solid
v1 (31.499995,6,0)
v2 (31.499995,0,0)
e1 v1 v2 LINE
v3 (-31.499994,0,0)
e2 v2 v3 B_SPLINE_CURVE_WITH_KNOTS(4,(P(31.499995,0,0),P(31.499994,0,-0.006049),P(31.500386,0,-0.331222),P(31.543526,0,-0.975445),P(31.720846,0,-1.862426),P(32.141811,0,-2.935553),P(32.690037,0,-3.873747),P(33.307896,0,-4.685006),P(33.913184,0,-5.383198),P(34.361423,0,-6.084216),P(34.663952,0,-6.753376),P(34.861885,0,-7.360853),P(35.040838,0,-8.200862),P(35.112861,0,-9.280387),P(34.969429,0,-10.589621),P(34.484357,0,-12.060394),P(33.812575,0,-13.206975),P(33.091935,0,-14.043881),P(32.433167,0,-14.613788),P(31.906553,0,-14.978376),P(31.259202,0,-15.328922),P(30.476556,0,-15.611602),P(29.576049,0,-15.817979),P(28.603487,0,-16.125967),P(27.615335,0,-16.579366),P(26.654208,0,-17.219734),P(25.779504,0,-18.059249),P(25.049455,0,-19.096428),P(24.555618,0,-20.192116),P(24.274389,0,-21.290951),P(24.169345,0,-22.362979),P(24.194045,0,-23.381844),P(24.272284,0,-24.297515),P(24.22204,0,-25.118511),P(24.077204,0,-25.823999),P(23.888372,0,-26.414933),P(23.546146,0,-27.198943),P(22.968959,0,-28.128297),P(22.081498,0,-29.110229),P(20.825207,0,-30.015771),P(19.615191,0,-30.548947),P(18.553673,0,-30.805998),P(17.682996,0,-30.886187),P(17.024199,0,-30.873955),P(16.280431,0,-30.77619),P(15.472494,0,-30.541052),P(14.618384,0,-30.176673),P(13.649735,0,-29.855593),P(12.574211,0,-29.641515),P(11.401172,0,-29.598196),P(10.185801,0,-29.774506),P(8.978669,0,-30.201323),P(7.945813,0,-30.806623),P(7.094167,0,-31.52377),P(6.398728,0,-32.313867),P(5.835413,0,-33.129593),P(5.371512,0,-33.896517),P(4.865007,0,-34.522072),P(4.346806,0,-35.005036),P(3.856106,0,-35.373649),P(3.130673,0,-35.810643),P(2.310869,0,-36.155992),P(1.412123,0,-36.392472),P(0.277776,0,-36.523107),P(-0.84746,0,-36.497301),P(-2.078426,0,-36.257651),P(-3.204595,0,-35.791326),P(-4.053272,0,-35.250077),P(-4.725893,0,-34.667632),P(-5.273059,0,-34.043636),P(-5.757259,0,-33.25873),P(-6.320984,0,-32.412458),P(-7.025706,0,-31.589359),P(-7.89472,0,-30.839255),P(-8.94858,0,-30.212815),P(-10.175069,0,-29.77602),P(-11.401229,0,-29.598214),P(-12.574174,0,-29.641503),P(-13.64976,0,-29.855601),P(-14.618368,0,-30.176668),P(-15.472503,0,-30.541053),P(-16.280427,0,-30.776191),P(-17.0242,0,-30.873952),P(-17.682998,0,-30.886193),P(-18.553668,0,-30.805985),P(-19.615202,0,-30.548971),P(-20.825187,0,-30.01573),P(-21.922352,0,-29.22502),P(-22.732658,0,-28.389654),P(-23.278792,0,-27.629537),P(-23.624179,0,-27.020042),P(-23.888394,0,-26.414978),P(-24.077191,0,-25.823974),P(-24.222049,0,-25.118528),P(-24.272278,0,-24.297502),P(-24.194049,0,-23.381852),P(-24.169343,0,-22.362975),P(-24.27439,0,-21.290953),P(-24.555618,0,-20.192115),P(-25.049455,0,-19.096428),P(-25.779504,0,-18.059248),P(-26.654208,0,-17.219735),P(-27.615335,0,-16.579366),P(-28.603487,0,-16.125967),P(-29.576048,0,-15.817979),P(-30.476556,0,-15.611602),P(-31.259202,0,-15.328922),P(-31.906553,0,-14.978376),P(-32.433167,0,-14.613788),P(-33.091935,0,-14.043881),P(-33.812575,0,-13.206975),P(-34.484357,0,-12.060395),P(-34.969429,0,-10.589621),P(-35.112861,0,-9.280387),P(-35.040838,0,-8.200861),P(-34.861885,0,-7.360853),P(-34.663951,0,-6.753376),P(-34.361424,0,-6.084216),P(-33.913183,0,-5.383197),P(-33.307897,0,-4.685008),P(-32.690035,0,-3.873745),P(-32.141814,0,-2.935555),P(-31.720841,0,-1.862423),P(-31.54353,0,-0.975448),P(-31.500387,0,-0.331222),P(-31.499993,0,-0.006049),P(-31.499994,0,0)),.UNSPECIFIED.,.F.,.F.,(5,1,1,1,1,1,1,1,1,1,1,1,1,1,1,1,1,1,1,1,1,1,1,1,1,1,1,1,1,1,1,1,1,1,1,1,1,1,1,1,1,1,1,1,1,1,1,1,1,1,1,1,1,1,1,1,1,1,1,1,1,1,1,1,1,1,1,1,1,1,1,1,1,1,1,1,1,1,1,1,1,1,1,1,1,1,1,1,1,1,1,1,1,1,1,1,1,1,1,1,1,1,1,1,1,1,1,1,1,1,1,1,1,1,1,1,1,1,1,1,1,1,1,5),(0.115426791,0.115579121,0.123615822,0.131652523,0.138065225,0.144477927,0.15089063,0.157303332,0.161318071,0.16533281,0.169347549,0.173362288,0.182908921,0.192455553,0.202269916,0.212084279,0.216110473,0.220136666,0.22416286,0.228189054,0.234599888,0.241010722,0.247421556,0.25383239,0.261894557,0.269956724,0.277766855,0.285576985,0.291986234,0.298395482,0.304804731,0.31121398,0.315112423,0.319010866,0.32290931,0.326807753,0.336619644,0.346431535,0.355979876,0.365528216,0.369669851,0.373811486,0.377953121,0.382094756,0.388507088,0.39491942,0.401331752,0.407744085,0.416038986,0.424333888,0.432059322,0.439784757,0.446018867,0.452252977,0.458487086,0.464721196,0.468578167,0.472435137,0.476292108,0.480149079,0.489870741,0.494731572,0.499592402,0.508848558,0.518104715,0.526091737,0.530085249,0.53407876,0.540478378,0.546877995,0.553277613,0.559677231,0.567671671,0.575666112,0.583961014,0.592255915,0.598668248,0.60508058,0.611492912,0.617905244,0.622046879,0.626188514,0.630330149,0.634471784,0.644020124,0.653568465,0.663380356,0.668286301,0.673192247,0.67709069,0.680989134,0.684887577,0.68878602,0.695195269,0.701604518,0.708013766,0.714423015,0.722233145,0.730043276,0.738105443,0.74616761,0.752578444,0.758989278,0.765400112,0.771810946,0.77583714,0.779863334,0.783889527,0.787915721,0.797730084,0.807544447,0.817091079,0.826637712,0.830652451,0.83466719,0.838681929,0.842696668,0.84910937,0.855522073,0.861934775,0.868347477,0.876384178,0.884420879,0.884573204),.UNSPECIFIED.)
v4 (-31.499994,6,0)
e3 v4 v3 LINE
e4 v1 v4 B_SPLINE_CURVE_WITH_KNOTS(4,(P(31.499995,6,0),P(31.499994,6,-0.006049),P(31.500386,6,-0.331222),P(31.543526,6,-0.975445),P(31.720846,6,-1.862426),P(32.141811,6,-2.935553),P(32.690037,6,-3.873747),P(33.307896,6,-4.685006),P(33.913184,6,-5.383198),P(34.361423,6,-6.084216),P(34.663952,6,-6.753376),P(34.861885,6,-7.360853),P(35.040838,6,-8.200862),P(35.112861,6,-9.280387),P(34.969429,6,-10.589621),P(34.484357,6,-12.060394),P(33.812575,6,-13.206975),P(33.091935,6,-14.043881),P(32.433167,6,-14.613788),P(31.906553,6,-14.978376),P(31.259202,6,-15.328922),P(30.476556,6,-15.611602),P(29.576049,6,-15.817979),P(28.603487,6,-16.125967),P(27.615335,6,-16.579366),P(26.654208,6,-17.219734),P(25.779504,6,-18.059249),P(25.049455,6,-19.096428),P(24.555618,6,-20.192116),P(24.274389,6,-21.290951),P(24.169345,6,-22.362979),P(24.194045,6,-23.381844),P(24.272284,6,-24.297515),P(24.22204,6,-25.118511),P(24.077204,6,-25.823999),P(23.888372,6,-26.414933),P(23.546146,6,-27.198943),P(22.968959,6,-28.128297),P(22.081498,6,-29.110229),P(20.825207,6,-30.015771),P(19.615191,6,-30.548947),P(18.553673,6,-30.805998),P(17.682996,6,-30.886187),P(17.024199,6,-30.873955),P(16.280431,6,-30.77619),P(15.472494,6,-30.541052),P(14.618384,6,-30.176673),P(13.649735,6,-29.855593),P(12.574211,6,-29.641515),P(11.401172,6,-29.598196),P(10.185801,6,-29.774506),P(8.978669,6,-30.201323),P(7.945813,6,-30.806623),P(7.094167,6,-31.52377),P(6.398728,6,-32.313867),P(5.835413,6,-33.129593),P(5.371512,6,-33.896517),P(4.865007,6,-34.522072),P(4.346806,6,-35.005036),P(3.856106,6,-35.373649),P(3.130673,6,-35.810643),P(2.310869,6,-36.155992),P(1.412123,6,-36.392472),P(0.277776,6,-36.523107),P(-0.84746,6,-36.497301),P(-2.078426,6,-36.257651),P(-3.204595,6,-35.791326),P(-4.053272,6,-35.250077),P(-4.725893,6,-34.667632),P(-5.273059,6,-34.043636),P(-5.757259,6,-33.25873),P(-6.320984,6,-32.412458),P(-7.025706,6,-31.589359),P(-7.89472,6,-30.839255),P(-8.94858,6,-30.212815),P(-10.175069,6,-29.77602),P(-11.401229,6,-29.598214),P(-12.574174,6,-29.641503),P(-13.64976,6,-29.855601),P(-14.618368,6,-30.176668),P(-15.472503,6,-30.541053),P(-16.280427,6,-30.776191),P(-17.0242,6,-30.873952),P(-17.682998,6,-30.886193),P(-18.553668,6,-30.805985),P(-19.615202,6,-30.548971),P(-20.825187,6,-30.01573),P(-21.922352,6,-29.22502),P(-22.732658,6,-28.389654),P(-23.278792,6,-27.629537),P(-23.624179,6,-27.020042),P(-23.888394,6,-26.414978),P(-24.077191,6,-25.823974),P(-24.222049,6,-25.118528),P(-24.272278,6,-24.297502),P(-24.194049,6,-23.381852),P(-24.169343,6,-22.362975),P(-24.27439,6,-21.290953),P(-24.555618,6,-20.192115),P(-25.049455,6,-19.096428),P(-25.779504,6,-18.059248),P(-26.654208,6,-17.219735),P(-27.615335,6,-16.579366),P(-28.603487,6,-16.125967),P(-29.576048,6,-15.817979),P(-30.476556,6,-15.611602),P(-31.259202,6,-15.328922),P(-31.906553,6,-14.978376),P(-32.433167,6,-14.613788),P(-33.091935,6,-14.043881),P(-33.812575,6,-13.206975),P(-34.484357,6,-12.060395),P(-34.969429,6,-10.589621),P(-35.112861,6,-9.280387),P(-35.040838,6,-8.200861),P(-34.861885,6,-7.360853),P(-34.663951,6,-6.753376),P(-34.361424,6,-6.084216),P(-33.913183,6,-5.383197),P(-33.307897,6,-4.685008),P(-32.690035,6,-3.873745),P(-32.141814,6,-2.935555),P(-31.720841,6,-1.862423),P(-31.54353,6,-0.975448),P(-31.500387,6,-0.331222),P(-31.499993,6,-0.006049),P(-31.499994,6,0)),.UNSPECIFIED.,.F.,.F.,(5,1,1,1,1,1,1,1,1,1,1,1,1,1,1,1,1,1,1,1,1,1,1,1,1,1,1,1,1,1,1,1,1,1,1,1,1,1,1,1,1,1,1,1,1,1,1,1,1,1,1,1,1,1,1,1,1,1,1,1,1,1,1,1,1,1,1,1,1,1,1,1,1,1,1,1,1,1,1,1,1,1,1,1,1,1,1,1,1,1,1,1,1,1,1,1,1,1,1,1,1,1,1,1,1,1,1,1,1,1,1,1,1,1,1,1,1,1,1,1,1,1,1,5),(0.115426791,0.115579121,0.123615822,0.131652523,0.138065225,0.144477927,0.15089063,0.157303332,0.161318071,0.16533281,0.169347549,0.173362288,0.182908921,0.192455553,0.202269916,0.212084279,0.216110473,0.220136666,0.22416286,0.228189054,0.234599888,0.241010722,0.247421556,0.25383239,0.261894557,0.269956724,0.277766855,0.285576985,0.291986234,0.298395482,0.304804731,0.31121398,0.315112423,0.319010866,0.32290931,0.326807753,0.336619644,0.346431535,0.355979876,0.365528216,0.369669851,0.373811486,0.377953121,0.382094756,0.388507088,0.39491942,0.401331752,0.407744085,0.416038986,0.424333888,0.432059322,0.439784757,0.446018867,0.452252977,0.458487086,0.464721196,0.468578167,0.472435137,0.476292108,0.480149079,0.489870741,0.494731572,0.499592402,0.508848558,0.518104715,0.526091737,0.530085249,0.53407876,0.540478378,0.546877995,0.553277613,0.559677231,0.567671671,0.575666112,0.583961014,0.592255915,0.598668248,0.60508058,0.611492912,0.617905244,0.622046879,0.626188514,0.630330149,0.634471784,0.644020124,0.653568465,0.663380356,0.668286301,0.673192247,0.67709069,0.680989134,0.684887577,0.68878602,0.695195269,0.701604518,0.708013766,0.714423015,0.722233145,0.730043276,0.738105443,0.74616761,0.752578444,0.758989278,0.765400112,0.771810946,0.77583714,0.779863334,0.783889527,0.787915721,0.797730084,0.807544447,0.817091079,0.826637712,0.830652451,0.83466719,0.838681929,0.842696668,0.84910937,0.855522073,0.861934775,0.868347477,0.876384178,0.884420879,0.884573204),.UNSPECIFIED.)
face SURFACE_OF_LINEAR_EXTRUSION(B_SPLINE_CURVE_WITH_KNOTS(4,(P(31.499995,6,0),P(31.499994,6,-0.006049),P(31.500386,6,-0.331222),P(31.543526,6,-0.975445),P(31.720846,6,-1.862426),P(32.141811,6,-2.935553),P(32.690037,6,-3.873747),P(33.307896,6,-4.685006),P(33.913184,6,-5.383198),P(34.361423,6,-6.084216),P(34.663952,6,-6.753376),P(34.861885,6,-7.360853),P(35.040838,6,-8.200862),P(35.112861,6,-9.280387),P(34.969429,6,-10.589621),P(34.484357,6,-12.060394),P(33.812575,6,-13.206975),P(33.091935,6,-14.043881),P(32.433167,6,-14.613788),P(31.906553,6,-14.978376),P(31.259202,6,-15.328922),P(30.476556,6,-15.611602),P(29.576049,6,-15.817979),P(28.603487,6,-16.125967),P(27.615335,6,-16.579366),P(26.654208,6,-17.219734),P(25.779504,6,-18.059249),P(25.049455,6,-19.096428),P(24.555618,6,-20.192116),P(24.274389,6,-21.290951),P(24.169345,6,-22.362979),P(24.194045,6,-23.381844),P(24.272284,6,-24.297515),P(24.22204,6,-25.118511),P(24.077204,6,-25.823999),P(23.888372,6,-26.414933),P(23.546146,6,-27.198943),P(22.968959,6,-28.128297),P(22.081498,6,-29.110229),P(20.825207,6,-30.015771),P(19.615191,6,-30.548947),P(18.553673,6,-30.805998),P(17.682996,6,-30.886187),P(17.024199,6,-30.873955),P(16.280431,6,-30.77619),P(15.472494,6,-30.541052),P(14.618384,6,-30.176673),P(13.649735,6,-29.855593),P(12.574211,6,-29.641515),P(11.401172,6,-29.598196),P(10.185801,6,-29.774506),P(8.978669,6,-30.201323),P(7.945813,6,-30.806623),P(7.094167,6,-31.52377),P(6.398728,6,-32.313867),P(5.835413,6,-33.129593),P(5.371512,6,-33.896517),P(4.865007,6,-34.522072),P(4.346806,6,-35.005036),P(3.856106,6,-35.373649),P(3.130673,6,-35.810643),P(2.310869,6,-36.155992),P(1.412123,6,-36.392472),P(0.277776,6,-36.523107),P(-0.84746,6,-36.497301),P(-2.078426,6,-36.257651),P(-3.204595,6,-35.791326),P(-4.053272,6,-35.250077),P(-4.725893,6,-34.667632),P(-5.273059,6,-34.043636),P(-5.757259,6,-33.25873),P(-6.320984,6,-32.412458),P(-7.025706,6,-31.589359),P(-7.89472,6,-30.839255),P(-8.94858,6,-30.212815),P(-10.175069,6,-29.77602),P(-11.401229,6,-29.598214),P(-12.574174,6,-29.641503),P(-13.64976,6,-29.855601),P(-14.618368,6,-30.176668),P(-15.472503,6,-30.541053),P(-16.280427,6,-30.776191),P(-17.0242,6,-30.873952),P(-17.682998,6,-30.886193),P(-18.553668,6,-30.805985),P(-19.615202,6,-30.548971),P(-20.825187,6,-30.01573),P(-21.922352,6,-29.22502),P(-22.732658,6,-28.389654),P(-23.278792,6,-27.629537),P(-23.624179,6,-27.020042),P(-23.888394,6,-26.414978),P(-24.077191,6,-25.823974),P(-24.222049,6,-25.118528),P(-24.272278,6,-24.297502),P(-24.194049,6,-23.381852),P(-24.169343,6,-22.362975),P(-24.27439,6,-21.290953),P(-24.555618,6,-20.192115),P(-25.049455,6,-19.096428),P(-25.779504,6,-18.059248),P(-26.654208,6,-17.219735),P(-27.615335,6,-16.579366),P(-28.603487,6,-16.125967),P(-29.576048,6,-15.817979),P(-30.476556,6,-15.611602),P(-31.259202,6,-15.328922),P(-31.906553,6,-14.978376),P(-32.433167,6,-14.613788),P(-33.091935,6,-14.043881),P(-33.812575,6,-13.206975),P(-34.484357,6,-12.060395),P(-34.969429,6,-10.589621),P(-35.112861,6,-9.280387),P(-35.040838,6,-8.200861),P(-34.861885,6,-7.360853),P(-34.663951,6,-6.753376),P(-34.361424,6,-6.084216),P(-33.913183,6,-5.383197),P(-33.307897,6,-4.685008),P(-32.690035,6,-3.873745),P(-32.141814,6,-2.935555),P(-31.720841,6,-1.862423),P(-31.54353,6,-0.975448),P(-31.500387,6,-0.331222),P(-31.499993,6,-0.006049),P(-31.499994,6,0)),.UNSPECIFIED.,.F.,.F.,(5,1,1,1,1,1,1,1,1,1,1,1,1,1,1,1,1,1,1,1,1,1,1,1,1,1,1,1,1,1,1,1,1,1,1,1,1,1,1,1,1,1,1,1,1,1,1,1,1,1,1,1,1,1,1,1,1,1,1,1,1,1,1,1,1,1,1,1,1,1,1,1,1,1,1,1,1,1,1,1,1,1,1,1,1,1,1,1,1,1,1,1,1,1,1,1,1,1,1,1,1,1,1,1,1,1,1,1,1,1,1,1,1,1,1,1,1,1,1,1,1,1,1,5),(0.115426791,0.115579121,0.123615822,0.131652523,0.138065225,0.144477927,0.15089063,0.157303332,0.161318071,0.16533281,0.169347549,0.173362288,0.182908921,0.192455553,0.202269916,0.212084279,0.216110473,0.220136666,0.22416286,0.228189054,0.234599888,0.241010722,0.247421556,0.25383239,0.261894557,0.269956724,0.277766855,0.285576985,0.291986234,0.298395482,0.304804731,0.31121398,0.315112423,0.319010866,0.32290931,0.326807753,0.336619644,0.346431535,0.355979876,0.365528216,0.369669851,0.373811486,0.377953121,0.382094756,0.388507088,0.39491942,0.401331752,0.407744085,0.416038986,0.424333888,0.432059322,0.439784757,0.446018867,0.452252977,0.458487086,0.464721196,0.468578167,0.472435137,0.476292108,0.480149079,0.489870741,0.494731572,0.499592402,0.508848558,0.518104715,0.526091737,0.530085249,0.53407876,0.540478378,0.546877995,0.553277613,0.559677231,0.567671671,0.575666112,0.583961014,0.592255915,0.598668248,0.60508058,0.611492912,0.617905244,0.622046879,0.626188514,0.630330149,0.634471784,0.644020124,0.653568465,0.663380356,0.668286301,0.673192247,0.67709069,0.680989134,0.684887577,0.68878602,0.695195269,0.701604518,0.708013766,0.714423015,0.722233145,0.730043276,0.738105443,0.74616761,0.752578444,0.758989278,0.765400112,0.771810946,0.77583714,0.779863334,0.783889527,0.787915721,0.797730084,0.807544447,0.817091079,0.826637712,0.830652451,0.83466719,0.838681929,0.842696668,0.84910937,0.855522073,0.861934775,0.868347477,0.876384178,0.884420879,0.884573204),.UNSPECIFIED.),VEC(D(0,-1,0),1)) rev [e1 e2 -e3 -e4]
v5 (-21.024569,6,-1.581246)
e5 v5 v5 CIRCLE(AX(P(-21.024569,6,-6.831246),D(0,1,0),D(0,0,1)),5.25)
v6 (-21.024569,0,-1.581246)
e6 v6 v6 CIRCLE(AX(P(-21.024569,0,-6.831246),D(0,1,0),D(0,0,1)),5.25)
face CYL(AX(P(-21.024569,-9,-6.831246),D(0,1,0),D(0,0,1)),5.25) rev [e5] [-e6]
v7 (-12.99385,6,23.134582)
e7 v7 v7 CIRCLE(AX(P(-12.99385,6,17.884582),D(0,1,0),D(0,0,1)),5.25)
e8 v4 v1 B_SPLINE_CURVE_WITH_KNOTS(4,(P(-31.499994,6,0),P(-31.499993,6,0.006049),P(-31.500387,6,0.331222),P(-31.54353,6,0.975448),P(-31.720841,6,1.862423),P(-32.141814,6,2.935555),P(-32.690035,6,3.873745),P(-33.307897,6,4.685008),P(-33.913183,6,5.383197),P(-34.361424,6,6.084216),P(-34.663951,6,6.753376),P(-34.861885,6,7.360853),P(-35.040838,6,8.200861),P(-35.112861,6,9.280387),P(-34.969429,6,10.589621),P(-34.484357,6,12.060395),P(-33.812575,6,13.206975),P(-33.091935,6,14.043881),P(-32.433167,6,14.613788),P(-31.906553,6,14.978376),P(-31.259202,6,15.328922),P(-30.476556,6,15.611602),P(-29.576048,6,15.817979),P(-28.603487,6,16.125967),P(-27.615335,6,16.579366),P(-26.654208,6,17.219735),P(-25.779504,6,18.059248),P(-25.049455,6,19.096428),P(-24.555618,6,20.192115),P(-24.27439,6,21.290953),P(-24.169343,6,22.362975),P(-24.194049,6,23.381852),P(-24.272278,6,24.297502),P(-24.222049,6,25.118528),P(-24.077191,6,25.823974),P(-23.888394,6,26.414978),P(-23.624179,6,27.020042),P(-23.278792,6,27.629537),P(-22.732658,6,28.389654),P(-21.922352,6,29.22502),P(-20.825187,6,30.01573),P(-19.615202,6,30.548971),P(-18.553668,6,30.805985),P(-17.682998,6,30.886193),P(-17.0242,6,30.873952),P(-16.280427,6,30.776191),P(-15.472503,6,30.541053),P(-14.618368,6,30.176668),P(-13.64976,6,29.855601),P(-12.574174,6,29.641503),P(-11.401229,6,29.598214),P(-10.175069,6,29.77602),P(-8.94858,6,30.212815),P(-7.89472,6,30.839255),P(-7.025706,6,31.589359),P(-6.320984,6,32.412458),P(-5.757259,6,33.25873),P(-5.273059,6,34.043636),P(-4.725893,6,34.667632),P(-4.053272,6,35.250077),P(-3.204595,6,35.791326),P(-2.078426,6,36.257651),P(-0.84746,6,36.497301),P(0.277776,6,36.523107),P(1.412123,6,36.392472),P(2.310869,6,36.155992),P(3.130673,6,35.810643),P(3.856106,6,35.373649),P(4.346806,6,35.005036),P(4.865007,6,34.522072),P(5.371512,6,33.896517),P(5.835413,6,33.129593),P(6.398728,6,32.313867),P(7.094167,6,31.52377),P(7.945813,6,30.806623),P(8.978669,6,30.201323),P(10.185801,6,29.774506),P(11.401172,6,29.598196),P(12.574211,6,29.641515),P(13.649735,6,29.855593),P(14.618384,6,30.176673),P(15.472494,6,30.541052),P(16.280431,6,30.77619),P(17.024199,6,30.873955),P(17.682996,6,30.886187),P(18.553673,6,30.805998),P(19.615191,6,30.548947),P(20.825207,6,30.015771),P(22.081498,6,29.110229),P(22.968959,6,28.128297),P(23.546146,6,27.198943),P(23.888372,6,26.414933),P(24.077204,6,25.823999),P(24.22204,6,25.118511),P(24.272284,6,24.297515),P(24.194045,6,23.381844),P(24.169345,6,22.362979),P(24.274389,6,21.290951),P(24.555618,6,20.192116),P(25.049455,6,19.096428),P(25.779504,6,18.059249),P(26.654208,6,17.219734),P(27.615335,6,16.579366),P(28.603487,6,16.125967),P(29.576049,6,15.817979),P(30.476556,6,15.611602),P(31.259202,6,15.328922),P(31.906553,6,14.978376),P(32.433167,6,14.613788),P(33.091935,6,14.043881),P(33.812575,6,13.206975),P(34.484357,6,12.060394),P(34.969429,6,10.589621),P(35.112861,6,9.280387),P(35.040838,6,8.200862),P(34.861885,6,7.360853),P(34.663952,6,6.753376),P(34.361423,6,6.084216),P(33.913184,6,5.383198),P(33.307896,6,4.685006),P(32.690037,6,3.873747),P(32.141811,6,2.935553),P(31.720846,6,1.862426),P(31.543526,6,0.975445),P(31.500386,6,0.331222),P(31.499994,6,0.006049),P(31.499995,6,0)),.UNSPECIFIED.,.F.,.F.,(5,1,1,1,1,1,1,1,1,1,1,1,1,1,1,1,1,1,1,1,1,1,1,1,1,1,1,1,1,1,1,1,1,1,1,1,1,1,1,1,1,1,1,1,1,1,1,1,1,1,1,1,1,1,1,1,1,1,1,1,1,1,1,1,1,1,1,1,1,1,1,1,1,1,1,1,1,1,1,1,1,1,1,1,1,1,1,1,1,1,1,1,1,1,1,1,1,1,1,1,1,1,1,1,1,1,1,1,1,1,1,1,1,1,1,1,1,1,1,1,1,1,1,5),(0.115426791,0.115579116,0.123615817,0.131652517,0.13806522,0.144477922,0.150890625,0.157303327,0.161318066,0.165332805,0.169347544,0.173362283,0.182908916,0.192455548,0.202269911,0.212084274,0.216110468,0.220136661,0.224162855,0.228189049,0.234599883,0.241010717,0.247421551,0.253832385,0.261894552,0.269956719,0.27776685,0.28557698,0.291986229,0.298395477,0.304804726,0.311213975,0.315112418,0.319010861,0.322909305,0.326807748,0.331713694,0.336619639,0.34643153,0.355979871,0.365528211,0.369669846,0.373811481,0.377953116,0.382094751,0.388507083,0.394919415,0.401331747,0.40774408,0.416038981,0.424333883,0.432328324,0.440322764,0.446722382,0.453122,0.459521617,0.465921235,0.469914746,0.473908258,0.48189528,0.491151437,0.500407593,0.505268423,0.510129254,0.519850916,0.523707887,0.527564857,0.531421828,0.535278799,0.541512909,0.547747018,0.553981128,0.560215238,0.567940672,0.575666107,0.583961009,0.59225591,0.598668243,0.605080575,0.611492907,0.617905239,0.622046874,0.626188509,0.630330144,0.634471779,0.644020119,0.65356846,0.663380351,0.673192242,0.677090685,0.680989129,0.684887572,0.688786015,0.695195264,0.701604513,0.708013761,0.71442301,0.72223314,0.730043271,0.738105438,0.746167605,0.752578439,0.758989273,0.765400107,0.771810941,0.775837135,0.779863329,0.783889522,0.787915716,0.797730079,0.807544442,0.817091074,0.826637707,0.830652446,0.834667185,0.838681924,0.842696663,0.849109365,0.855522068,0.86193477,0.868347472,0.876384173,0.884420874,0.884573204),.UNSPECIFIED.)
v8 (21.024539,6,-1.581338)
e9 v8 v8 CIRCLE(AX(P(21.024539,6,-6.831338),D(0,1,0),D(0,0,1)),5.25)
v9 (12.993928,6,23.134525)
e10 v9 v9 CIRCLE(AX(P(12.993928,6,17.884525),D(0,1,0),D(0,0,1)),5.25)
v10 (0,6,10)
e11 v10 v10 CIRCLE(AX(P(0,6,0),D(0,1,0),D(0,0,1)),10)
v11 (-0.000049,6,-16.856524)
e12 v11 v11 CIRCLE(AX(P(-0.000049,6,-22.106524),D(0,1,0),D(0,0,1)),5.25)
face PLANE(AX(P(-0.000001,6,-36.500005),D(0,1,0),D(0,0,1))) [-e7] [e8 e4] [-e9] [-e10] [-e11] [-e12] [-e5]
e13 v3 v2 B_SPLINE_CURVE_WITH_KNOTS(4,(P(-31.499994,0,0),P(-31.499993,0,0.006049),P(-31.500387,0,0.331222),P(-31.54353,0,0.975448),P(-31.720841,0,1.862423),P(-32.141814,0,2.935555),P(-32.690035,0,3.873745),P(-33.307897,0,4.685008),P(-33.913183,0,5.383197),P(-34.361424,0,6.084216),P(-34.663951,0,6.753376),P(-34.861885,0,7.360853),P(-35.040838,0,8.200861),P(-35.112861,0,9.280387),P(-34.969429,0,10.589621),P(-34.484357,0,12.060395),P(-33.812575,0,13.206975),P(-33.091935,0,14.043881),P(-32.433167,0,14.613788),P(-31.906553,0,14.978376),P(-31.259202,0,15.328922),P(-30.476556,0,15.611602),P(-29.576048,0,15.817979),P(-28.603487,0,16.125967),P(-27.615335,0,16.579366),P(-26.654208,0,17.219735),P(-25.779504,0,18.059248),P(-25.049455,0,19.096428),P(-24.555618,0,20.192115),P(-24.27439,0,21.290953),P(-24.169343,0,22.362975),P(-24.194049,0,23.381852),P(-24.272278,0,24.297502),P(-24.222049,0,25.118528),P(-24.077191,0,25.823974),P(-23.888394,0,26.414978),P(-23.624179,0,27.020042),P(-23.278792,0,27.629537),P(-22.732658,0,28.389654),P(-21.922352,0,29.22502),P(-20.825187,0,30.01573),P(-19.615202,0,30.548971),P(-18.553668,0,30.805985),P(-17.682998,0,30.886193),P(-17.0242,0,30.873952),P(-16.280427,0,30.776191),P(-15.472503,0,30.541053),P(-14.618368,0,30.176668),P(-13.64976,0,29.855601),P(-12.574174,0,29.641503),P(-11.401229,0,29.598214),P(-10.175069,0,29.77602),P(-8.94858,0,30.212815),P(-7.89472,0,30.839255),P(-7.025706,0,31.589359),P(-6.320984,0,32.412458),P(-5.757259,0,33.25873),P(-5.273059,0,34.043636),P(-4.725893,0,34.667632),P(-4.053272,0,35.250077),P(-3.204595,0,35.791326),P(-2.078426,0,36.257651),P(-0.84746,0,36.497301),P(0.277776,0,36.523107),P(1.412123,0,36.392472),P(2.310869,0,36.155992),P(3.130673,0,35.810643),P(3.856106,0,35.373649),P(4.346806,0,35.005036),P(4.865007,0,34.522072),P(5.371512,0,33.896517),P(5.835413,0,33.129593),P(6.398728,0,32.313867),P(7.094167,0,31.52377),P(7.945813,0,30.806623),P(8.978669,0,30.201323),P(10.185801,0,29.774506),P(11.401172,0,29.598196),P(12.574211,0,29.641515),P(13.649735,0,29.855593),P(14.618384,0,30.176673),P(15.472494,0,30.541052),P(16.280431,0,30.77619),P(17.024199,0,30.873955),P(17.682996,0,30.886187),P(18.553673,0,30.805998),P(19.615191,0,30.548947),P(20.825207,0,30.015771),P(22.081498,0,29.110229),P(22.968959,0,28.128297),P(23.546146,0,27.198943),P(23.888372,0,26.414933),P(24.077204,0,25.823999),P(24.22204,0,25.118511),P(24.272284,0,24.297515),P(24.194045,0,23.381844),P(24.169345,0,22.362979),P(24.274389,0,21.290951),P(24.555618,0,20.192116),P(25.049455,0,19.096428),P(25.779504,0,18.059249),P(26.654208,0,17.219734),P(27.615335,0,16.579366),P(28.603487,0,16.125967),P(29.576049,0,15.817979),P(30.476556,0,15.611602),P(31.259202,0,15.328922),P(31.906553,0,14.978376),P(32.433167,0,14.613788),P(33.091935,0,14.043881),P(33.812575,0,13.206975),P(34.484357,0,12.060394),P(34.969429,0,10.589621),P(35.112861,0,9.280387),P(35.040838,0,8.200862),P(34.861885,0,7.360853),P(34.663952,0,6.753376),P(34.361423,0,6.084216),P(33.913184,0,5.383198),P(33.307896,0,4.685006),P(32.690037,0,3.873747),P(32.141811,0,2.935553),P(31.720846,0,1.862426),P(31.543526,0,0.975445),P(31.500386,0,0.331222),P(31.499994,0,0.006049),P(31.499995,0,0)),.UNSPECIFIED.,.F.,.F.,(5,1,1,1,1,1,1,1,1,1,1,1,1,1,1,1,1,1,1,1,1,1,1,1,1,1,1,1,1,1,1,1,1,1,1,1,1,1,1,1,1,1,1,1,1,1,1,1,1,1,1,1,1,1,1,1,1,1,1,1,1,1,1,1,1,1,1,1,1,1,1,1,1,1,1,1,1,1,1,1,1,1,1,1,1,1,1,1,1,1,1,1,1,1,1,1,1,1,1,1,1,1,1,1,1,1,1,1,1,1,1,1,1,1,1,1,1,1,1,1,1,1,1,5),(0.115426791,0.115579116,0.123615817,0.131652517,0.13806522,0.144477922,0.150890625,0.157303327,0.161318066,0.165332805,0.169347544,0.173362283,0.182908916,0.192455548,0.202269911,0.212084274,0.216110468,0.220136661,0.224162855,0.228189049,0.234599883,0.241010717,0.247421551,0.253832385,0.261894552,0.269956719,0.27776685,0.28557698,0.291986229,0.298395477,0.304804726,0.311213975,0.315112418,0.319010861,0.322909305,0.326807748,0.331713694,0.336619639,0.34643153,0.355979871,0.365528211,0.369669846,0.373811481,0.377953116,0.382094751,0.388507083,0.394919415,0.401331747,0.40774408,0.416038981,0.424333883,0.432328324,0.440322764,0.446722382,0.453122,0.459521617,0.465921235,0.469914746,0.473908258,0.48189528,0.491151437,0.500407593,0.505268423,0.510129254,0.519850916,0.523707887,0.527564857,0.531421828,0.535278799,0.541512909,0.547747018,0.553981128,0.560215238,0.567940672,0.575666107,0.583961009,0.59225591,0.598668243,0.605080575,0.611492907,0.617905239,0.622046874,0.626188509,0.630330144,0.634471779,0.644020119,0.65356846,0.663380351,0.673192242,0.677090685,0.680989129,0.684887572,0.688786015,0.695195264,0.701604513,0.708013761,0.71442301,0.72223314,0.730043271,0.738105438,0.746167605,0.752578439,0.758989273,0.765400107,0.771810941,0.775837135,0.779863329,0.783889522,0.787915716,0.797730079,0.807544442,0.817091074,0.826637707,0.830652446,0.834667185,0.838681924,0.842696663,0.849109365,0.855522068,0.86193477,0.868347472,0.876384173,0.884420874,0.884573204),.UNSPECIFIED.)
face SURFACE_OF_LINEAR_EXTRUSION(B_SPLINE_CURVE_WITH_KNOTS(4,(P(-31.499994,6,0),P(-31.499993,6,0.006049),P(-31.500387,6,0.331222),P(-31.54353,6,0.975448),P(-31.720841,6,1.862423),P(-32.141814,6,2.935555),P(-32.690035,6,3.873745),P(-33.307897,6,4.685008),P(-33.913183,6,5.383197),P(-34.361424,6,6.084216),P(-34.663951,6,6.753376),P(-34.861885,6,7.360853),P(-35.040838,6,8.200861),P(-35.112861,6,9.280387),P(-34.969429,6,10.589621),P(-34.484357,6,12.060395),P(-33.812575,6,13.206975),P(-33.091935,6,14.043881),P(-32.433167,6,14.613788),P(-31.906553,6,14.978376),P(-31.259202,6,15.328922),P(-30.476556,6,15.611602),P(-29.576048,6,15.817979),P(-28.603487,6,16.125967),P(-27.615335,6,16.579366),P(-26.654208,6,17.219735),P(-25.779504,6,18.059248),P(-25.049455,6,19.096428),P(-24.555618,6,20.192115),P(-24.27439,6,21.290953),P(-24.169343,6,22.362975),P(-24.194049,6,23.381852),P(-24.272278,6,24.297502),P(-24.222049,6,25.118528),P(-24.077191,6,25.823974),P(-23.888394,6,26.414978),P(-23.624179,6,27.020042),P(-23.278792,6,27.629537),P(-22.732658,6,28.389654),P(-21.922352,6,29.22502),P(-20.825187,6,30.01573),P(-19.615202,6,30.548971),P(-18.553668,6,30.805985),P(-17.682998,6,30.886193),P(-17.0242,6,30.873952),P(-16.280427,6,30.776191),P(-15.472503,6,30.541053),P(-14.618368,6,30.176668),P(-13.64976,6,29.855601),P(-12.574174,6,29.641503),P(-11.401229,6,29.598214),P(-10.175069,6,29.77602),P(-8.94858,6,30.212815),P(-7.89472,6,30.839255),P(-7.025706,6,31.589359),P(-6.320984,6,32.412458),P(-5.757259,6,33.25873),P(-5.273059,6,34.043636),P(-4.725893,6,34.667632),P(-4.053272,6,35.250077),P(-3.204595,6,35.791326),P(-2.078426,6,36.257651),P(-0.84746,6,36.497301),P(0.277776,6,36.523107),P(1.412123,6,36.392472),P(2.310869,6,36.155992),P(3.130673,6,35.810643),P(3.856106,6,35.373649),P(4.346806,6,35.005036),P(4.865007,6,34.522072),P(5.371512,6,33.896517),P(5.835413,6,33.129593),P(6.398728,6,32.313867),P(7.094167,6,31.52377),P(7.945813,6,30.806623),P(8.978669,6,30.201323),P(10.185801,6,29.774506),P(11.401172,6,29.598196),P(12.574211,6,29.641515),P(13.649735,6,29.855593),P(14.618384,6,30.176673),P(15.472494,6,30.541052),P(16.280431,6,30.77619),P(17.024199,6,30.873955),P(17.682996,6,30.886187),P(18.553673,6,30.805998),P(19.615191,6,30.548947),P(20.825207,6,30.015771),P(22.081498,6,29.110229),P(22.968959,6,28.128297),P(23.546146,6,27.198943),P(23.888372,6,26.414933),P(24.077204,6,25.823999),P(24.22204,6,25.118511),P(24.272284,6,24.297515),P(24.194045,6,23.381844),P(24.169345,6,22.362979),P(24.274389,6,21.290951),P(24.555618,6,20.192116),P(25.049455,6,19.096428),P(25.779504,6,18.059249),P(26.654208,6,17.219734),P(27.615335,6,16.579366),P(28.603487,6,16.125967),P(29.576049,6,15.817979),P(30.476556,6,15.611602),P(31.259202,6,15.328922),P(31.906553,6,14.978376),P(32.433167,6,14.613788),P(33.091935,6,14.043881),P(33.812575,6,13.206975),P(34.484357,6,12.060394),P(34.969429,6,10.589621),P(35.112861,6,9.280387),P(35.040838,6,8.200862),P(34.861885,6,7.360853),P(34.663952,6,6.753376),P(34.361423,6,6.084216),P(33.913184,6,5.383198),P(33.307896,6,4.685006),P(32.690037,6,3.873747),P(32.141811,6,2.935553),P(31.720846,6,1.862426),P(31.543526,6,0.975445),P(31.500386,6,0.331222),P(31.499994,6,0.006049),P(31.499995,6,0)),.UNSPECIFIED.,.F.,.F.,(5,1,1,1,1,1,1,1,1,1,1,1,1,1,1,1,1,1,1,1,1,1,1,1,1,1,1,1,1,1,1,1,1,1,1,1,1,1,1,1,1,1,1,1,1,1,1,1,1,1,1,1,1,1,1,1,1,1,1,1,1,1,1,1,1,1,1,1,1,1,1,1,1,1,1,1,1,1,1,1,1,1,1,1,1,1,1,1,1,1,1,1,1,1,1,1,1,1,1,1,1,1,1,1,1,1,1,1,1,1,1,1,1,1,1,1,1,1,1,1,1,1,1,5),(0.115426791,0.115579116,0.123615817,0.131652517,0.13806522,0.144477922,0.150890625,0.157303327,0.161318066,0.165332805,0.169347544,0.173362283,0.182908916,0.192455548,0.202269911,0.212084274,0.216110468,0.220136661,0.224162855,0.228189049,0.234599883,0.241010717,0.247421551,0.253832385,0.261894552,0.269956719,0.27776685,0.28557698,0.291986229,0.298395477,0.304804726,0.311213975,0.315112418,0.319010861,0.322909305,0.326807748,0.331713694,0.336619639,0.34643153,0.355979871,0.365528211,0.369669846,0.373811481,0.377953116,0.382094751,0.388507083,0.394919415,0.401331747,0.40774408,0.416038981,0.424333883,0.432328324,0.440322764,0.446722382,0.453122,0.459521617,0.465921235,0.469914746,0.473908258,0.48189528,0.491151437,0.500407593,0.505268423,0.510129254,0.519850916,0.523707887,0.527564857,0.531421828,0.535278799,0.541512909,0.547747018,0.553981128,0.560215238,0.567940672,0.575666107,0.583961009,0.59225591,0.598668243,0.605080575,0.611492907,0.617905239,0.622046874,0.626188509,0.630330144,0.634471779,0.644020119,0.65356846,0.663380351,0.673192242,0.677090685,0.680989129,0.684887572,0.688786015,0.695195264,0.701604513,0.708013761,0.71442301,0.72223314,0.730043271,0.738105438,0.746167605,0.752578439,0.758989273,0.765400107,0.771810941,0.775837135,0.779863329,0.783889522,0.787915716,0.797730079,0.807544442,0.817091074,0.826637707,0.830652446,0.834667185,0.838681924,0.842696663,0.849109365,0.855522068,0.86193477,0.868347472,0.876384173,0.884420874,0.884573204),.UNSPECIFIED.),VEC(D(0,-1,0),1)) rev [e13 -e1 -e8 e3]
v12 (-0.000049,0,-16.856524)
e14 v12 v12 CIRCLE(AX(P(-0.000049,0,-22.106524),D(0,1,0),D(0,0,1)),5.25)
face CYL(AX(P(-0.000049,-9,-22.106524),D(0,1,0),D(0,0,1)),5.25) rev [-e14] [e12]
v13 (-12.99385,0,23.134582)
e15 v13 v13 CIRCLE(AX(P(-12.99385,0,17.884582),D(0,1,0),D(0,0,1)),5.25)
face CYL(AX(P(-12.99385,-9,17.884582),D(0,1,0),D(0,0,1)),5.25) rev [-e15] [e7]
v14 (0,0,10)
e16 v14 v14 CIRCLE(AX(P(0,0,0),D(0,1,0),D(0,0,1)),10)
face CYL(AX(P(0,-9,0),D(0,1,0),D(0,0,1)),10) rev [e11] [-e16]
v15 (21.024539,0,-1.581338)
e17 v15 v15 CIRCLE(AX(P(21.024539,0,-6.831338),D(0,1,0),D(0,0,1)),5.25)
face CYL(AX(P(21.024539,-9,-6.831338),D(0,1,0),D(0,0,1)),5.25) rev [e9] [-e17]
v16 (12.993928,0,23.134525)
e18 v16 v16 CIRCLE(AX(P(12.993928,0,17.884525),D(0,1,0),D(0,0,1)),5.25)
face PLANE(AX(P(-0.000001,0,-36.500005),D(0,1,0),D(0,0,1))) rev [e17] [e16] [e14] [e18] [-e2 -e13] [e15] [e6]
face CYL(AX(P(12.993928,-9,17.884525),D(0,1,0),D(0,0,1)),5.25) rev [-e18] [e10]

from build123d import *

# Parameters (mm, degrees)
BOSS_EXTRUDE2_DEPTH = 6
SKETCH8_R           = 5.25
SKETCH8_R_2         = 10
CUT_EXTRUDE1_DEPTH  = 15


# Read off the part's stored shape, not the designer's step: Boss-Extrude2
with BuildPart() as part:
    # Boss-Extrude2 outline → Boss-Extrude2 (new body)
    with BuildSketch(Plane(origin=(0, 0, 0), x_dir=(1, 0, 0), z_dir=(0, 1, 0))):
        with BuildLine():
            add(Edge.make_bspline(
                [(-31.499993504, 0), (-31.499993419, -0.00604861), (-31.50038656, -0.331222159), (-31.543529646, -0.975447868), (-31.720841141, -1.86242283), (-32.141813755, -2.935555351), (-32.690034798, -3.873745201), (-33.307897052, -4.685007547), (-33.913183196, -5.38319735), (-34.361423558, -6.084216031), (-34.663951399, -6.753375858), (-34.861884865, -7.360852844), (-35.040837742, -8.200861452), (-35.112861284, -9.280386882), (-34.96942898, -10.589620807), (-34.484356858, -12.060394501), (-33.812574702, -13.2069754), (-33.091935075, -14.043880698), (-32.433167143, -14.613787937), (-31.906553334, -14.97837614), (-31.259202182, -15.328922299), (-30.476556206, -15.611601701), (-29.576048481, -15.817978522), (-28.603486754, -16.125966833), (-27.615334966, -16.579365945), (-26.654208043, -17.219734538), (-25.779503529, -18.059248358), (-25.049455366, -19.096428499), (-24.555617668, -20.192114936), (-24.274390159, -21.290953441), (-24.169343307, -22.362975244), (-24.194048583, -23.3818518), (-24.272277679, -24.297501934), (-24.22204854, -25.118528202), (-24.077190933, -25.823973525), (-23.888393636, -26.414977622), (-23.624178999, -27.020042218), (-23.278791803, -27.629537082), (-22.732658436, -28.38965416), (-21.922352281, -29.225019964), (-20.825187152, -30.015729577), (-19.615201803, -30.548970617), (-18.55366793, -30.805984952), (-17.682998284, -30.886193311), (-17.024199682, -30.873951656), (-16.280427126, -30.776191349), (-15.472502635, -30.541053046), (-14.618367559, -30.176668488), (-13.64975963, -29.855600754), (-12.574174193, -29.641503211), (-11.401229274, -29.598214263), (-10.175069451, -29.776019818), (-8.948580224, -30.212814968), (-7.894719665, -30.83925516), (-7.025705572, -31.589359041), (-6.320984457, -32.412458415), (-5.757258901, -33.258730106), (-5.273058589, -34.043636024), (-4.725893182, -34.66763204), (-4.053271763, -35.250077039), (-3.204594881, -35.791325942), (-2.078426192, -36.257650554), (-0.847460094, -36.497301275), (0.277775766, -36.523106962), (1.412122853, -36.392471929), (2.310868949, -36.155991526), (3.130672847, -35.810642797), (3.856106157, -35.373648518), (4.346805755, -35.005036367), (4.865006719, -34.522072188), (5.371511978, -33.896516796), (5.835413279, -33.129593461), (6.398728076, -32.313866645), (7.094167258, -31.523769895), (7.945813189, -30.806623471), (8.978669327, -30.201322987), (10.18580069, -29.774506124), (11.401172088, -29.598195906), (12.574210653, -29.641514683), (13.649734591, -29.855593263), (14.618384312, -30.176672775), (15.472494021, -30.541052054), (16.280430851, -30.776190175), (17.02419909, -30.873955043), (17.682996136, -30.886186775), (18.553673497, -30.805997522), (19.615190622, -30.548947207), (20.825207419, -30.015770951), (22.081497826, -29.110228874), (22.968958631, -28.128296522), (23.546146407, -27.198942866), (23.888371532, -26.414933393), (24.077203873, -25.823999416), (24.222040012, -25.118511141), (24.272284078, -24.297514737), (24.194044591, -23.381843813), (24.16934539, -22.362979412), (24.274389118, -21.290951357), (24.555618274, -20.192116148), (25.049454993, -19.096427752), (25.779503766, -18.059248834), (26.654207893, -17.219734238), (27.615335064, -16.579366141), (28.603486687, -16.1259667), (29.576048527, -15.817978613), (30.476556179, -15.611601649), (31.259202197, -15.328922327), (31.906553325, -14.978376124), (32.43316715, -14.613787947), (33.091935066, -14.043880688), (33.812574717, -13.206975413), (34.484356834, -12.060394481), (34.969429016, -10.589620836), (35.112861237, -9.280386846), (35.040837808, -8.200861503), (34.86188476, -7.360852764), (34.663951614, -6.753376022), (34.36142315, -6.08421572), (33.913183962, -5.383197934), (33.307895638, -4.68500647), (32.690036895, -3.873746798), (32.141810592, -2.935552943), (31.720845785, -1.862426365), (31.543525655, -0.975444663), (31.500386236, -0.331221533), (31.499994445, -0.006048791), (31.499994555, 0)],
                knots=[0.115426791, 0.115426791, 0.115426791, 0.115426791, 0.115426791, 0.115579116, 0.123615817, 0.131652517, 0.13806522, 0.144477922, 0.150890625, 0.157303327, 0.161318066, 0.165332805, 0.169347544, 0.173362283, 0.182908916, 0.192455548, 0.202269911, 0.212084274, 0.216110468, 0.220136661, 0.224162855, 0.228189049, 0.234599883, 0.241010717, 0.247421551, 0.253832385, 0.261894552, 0.269956719, 0.27776685, 0.28557698, 0.291986229, 0.298395477, 0.304804726, 0.311213975, 0.315112418, 0.319010861, 0.322909305, 0.326807748, 0.331713694, 0.336619639, 0.34643153, 0.355979871, 0.365528211, 0.369669846, 0.373811481, 0.377953116, 0.382094751, 0.388507083, 0.394919415, 0.401331747, 0.40774408, 0.416038981, 0.424333883, 0.432328324, 0.440322764, 0.446722382, 0.453122, 0.459521617, 0.465921235, 0.469914746, 0.473908258, 0.48189528, 0.491151437, 0.500407593, 0.505268423, 0.510129254, 0.519850916, 0.523707887, 0.527564857, 0.531421828, 0.535278799, 0.541512909, 0.547747018, 0.553981128, 0.560215238, 0.567940672, 0.575666107, 0.583961009, 0.59225591, 0.598668243, 0.605080575, 0.611492907, 0.617905239, 0.622046874, 0.626188509, 0.630330144, 0.634471779, 0.644020119, 0.65356846, 0.663380351, 0.673192242, 0.677090685, 0.680989129, 0.684887572, 0.688786015, 0.695195264, 0.701604513, 0.708013761, 0.71442301, 0.72223314, 0.730043271, 0.738105438, 0.746167605, 0.752578439, 0.758989273, 0.765400107, 0.771810941, 0.775837135, 0.779863329, 0.783889522, 0.787915716, 0.797730079, 0.807544442, 0.817091074, 0.826637707, 0.830652446, 0.834667185, 0.838681924, 0.842696663, 0.849109365, 0.855522068, 0.86193477, 0.868347472, 0.876384173, 0.884420874, 0.884573204, 0.884573204, 0.884573204, 0.884573204, 0.884573204], degree=4))
            add(Edge.make_bspline(
                [(31.499994555, 0), (31.499994445, 0.006048791), (31.500386236, 0.331221533), (31.543525655, 0.975444663), (31.720845785, 1.862426365), (32.141810592, 2.935552943), (32.690036895, 3.873746798), (33.307895638, 4.68500647), (33.913183962, 5.383197934), (34.36142315, 6.08421572), (34.663951614, 6.753376022), (34.86188476, 7.360852764), (35.040837808, 8.200861503), (35.112861237, 9.280386846), (34.969429016, 10.589620836), (34.484356834, 12.060394481), (33.812574717, 13.206975413), (33.091935066, 14.043880688), (32.43316715, 14.613787947), (31.906553325, 14.978376124), (31.259202197, 15.328922327), (30.476556179, 15.611601649), (29.576048527, 15.817978613), (28.603486687, 16.1259667), (27.615335064, 16.579366141), (26.654207893, 17.219734238), (25.779503766, 18.059248834), (25.049454993, 19.096427752), (24.555618274, 20.192116148), (24.274389118, 21.290951357), (24.16934539, 22.362979412), (24.194044591, 23.381843813), (24.272284078, 24.297514737), (24.222040012, 25.118511141), (24.077203873, 25.823999416), (23.888371532, 26.414933393), (23.546146407, 27.198942866), (22.968958631, 28.128296522), (22.081497826, 29.110228874), (20.825207419, 30.015770951), (19.615190622, 30.548947207), (18.553673497, 30.805997522), (17.682996136, 30.886186775), (17.02419909, 30.873955043), (16.280430851, 30.776190175), (15.472494021, 30.541052054), (14.618384312, 30.176672775), (13.649734591, 29.855593263), (12.574210653, 29.641514683), (11.401172088, 29.598195906), (10.18580069, 29.774506124), (8.978669327, 30.201322987), (7.945813189, 30.806623471), (7.094167258, 31.523769895), (6.398728076, 32.313866645), (5.835413279, 33.129593461), (5.371511978, 33.896516796), (4.865006719, 34.522072188), (4.346805755, 35.005036367), (3.856106157, 35.373648518), (3.130672847, 35.810642797), (2.310868949, 36.155991526), (1.412122853, 36.392471929), (0.277775766, 36.523106962), (-0.847460094, 36.497301275), (-2.078426192, 36.257650554), (-3.204594881, 35.791325942), (-4.053271763, 35.250077039), (-4.725893182, 34.66763204), (-5.273058589, 34.043636024), (-5.757258901, 33.258730106), (-6.320984457, 32.412458415), (-7.025705572, 31.589359041), (-7.894719665, 30.83925516), (-8.948580224, 30.212814968), (-10.175069451, 29.776019818), (-11.401229274, 29.598214263), (-12.574174193, 29.641503211), (-13.64975963, 29.855600754), (-14.618367559, 30.176668488), (-15.472502635, 30.541053046), (-16.280427126, 30.776191349), (-17.024199682, 30.873951656), (-17.682998284, 30.886193311), (-18.55366793, 30.805984952), (-19.615201803, 30.548970617), (-20.825187152, 30.015729577), (-21.922352281, 29.225019964), (-22.732658436, 28.38965416), (-23.278791803, 27.629537082), (-23.624178999, 27.020042218), (-23.888393636, 26.414977622), (-24.077190933, 25.823973525), (-24.22204854, 25.118528202), (-24.272277679, 24.297501934), (-24.194048583, 23.3818518), (-24.169343307, 22.362975244), (-24.274390159, 21.290953441), (-24.555617668, 20.192114936), (-25.049455366, 19.096428499), (-25.779503529, 18.059248358), (-26.654208043, 17.219734538), (-27.615334966, 16.579365945), (-28.603486754, 16.125966833), (-29.576048481, 15.817978522), (-30.476556206, 15.611601701), (-31.259202182, 15.328922299), (-31.906553334, 14.97837614), (-32.433167143, 14.613787937), (-33.091935075, 14.043880698), (-33.812574702, 13.2069754), (-34.484356858, 12.060394501), (-34.96942898, 10.589620807), (-35.112861284, 9.280386882), (-35.040837742, 8.200861452), (-34.861884865, 7.360852844), (-34.663951399, 6.753375858), (-34.361423558, 6.084216031), (-33.913183196, 5.38319735), (-33.307897052, 4.685007547), (-32.690034798, 3.873745201), (-32.141813755, 2.935555351), (-31.720841141, 1.86242283), (-31.543529646, 0.975447868), (-31.50038656, 0.331222159), (-31.499993419, 0.00604861), (-31.499993504, 0)],
                knots=[0.115426791, 0.115426791, 0.115426791, 0.115426791, 0.115426791, 0.115579121, 0.123615822, 0.131652523, 0.138065225, 0.144477927, 0.15089063, 0.157303332, 0.161318071, 0.16533281, 0.169347549, 0.173362288, 0.182908921, 0.192455553, 0.202269916, 0.212084279, 0.216110473, 0.220136666, 0.22416286, 0.228189054, 0.234599888, 0.241010722, 0.247421556, 0.25383239, 0.261894557, 0.269956724, 0.277766855, 0.285576985, 0.291986234, 0.298395482, 0.304804731, 0.31121398, 0.315112423, 0.319010866, 0.32290931, 0.326807753, 0.336619644, 0.346431535, 0.355979876, 0.365528216, 0.369669851, 0.373811486, 0.377953121, 0.382094756, 0.388507088, 0.39491942, 0.401331752, 0.407744085, 0.416038986, 0.424333888, 0.432059322, 0.439784757, 0.446018867, 0.452252977, 0.458487086, 0.464721196, 0.468578167, 0.472435137, 0.476292108, 0.480149079, 0.489870741, 0.494731572, 0.499592402, 0.508848558, 0.518104715, 0.526091737, 0.530085249, 0.53407876, 0.540478378, 0.546877995, 0.553277613, 0.559677231, 0.567671671, 0.575666112, 0.583961014, 0.592255915, 0.598668248, 0.60508058, 0.611492912, 0.617905244, 0.622046879, 0.626188514, 0.630330149, 0.634471784, 0.644020124, 0.653568465, 0.663380356, 0.668286301, 0.673192247, 0.67709069, 0.680989134, 0.684887577, 0.68878602, 0.695195269, 0.701604518, 0.708013766, 0.714423015, 0.722233145, 0.730043276, 0.738105443, 0.74616761, 0.752578444, 0.758989278, 0.765400112, 0.771810946, 0.77583714, 0.779863334, 0.783889527, 0.787915721, 0.797730084, 0.807544447, 0.817091079, 0.826637712, 0.830652451, 0.83466719, 0.838681929, 0.842696668, 0.84910937, 0.855522073, 0.861934775, 0.868347477, 0.876384178, 0.884420879, 0.884573204, 0.884573204, 0.884573204, 0.884573204, 0.884573204], degree=4))
        make_face()
    extrude(amount=BOSS_EXTRUDE2_DEPTH)

    # Sketch8 → Cut-Extrude1 (cut)
    with BuildSketch(Plane(origin=(0, 6, 0), x_dir=(1, 0, 0), z_dir=(0, 1, 0))):
        with Locations(Location((-21.024568871, 6.831245518, 0), (0, 0, 270))):
            Circle(SKETCH8_R)
        with Locations(Location((0, 0, 0), (0, 0, 270))):
            Circle(SKETCH8_R_2)
        with Locations(Location((-4.8516e-05, 22.106524185, 0), (0, 0, 270))):
            Circle(SKETCH8_R)
        with Locations(Location((21.024538886, 6.831337801, 0), (0, 0, 270))):
            Circle(SKETCH8_R)
        with Locations(Location((12.993928145, -17.884525235, 0), (0, 0, 270))):
            Circle(SKETCH8_R)
        with Locations(Location((-12.993849645, -17.884582269, 0), (0, 0, 270))):
            Circle(SKETCH8_R)
    extrude(amount=-CUT_EXTRUDE1_DEPTH, mode=Mode.SUBTRACT)


solid = part.part
